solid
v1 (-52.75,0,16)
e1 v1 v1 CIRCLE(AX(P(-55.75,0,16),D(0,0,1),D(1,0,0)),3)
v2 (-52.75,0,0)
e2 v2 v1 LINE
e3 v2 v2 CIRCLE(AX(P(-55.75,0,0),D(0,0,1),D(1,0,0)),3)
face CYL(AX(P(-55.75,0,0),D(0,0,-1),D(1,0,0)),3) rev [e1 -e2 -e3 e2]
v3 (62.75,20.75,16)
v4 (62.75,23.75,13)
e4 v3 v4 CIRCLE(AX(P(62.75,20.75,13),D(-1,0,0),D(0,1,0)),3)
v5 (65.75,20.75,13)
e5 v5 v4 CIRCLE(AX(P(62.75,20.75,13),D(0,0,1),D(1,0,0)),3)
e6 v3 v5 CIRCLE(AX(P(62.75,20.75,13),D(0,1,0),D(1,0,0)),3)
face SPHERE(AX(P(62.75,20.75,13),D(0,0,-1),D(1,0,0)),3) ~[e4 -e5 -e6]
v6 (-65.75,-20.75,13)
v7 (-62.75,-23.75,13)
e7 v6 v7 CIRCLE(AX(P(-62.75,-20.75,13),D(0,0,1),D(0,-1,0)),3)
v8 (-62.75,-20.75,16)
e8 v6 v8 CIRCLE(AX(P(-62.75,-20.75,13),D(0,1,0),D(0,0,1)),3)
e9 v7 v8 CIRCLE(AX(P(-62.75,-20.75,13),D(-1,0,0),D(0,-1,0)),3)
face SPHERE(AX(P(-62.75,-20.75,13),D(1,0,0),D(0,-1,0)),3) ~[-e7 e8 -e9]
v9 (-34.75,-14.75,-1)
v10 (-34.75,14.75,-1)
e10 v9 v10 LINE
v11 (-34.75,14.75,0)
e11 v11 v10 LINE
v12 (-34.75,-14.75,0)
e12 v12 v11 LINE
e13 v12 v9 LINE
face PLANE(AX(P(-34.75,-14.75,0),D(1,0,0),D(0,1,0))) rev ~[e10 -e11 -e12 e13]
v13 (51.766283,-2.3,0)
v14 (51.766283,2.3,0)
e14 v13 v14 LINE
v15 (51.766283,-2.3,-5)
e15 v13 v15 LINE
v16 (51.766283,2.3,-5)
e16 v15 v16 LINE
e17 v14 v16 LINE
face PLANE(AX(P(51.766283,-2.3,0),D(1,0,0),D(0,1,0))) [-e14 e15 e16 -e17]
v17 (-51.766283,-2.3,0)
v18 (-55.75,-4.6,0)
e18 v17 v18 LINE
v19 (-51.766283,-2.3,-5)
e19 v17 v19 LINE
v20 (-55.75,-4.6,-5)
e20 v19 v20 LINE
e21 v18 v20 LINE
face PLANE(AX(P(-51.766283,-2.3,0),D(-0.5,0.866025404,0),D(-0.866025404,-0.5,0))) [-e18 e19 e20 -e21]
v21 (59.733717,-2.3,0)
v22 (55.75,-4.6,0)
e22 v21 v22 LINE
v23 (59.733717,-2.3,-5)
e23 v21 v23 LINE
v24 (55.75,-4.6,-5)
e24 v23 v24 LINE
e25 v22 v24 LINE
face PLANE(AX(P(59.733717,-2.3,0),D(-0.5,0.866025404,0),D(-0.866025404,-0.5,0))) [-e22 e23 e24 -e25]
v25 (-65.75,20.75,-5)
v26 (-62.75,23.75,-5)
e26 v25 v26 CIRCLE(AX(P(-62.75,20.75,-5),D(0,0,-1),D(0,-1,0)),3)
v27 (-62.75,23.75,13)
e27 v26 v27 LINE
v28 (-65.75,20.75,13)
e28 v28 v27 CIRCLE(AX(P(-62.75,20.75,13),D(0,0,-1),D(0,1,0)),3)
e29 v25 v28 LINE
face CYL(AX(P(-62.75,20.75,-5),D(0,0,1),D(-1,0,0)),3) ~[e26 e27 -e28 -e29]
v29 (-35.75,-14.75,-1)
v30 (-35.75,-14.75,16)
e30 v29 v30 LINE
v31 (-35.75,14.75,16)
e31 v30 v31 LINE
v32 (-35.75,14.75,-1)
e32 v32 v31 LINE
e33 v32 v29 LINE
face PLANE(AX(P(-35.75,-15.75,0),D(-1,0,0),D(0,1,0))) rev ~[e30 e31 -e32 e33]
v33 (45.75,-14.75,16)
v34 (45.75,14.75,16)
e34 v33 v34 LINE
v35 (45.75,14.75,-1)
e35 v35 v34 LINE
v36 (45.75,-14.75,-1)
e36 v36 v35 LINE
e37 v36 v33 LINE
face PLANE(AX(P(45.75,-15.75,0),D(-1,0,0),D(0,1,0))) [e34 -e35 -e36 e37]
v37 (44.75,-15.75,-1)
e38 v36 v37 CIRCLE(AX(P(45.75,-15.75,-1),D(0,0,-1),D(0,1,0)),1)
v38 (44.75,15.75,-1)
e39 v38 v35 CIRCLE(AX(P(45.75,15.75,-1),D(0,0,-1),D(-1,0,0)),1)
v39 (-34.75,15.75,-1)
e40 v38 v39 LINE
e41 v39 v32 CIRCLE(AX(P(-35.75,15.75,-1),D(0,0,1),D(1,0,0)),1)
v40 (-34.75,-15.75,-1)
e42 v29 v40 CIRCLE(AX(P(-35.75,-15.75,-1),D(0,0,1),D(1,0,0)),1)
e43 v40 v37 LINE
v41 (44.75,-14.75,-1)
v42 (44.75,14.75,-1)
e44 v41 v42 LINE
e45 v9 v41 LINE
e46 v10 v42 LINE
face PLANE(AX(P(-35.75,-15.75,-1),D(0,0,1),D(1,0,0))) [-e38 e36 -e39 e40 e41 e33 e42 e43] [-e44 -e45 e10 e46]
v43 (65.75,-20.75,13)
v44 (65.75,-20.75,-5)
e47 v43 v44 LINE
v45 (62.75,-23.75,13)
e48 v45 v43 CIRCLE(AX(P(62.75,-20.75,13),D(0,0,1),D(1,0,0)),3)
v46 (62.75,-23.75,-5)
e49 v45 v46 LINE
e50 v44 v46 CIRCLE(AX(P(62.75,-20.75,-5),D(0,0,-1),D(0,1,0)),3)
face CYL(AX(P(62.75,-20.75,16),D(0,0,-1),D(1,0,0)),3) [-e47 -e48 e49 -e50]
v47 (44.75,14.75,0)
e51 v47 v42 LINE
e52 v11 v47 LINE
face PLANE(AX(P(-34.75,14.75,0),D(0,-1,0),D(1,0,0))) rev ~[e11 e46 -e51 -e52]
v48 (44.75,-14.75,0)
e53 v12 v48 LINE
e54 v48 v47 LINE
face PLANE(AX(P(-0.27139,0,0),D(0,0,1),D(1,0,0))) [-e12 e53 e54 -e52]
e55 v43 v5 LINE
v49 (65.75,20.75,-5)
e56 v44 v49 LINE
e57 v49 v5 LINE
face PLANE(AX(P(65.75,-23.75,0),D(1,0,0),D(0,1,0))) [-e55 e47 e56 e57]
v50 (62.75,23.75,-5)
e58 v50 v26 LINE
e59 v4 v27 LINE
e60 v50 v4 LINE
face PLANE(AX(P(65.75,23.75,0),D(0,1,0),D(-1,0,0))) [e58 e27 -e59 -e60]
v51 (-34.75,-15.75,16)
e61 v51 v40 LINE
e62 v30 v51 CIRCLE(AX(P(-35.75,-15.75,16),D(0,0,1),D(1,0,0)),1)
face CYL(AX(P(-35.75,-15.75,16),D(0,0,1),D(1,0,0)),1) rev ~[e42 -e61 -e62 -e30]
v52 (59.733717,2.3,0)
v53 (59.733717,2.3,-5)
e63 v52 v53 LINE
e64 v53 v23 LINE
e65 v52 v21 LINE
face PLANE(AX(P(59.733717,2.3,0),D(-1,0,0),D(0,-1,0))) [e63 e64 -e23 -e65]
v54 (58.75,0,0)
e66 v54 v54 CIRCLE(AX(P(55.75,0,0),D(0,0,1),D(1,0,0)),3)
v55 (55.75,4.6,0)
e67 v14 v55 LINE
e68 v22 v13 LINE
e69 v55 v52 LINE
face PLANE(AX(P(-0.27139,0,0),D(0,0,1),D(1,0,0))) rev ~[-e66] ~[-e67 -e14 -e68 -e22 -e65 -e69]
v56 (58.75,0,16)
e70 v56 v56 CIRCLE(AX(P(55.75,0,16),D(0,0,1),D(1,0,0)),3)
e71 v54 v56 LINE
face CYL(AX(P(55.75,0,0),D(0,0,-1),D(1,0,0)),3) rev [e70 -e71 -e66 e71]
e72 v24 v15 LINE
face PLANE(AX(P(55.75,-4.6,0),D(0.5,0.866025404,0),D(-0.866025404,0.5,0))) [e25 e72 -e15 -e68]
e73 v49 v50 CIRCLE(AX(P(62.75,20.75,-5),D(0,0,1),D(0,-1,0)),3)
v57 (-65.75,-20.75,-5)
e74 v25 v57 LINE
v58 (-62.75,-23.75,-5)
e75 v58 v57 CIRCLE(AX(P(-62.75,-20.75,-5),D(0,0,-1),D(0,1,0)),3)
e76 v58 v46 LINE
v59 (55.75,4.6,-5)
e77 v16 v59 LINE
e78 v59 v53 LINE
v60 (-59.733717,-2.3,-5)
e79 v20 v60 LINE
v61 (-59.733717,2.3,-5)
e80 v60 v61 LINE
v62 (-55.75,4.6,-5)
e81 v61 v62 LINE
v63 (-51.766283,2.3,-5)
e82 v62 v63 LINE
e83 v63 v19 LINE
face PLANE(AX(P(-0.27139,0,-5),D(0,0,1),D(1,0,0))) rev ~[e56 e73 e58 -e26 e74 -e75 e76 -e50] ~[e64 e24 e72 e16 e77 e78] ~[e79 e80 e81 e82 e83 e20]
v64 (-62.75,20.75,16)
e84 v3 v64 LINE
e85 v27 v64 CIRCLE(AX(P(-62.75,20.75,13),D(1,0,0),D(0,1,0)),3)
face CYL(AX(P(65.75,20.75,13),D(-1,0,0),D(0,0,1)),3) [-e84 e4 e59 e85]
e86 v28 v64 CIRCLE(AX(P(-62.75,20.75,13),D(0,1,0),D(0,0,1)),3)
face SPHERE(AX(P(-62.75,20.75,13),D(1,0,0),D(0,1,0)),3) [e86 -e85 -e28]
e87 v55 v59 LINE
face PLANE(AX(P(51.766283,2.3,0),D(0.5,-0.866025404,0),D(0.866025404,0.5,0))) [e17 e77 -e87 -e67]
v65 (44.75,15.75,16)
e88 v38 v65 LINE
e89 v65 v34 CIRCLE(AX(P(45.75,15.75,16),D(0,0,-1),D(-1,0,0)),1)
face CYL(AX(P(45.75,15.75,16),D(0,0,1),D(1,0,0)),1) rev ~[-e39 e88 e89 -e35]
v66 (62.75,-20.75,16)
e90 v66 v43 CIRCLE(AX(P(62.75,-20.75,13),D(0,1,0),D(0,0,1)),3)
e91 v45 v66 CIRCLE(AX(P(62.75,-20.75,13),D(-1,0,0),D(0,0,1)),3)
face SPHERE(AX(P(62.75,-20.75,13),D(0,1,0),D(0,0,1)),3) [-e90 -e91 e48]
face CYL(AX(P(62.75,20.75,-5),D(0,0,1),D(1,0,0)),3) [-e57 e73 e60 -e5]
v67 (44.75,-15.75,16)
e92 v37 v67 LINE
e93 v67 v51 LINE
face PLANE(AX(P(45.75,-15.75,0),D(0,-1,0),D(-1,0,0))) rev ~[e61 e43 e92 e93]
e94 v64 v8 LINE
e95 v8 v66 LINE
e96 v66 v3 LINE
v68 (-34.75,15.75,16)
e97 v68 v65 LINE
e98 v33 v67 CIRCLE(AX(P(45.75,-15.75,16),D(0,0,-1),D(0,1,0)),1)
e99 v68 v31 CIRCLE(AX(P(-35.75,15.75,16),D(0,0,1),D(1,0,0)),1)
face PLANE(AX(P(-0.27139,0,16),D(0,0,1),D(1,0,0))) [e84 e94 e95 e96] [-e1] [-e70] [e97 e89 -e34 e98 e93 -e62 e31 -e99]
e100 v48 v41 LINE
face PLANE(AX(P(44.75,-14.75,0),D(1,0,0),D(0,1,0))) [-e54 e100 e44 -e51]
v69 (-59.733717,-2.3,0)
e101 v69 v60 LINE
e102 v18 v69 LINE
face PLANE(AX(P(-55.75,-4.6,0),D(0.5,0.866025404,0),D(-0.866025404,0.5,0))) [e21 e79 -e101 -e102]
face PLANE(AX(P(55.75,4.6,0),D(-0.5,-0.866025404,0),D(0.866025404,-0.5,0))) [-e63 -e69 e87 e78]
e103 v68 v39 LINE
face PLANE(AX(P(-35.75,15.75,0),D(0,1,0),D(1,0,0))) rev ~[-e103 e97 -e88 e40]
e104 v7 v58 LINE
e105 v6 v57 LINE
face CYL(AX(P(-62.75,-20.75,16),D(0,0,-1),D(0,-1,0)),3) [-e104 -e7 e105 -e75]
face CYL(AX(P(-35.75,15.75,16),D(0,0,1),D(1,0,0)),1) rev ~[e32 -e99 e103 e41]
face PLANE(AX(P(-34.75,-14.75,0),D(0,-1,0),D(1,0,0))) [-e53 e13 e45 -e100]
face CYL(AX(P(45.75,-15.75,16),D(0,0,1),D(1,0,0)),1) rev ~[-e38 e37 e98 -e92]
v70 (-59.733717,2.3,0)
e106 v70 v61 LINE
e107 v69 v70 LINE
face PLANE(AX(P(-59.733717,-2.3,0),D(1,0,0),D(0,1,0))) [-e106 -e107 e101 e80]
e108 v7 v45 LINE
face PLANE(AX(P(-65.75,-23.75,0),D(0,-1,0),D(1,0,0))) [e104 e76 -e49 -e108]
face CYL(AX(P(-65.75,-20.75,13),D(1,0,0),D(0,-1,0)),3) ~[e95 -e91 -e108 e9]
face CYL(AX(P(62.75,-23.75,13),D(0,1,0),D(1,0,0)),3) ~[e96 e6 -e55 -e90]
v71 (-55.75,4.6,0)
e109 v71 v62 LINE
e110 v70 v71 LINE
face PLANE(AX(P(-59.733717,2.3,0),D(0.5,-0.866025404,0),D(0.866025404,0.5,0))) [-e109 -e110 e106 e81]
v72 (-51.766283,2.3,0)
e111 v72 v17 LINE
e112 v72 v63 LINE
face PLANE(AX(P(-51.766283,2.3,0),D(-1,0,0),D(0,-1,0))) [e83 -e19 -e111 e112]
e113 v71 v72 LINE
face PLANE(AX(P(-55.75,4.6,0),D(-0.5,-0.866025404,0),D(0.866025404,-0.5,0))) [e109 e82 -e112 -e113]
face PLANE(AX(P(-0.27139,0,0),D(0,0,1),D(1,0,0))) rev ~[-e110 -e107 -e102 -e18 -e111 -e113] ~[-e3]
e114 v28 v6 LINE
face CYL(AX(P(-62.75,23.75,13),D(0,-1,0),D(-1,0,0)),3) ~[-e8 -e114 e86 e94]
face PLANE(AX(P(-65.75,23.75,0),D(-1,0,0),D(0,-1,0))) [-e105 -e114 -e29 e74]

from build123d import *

# Parameters (mm, degrees)
F0_W     = 20
F0_H     = 31.5
F0_R     = 3
F1_DEPTH = 16
F2_DEPTH = 5
F3_W     = 79.5
F3_H     = 29.5
F4_DEPTH = 1
F5_R     = 1
F6_DEPTH = 17
F7_R     = 3


# Not quite as in the source:
# - a feature names something its author has since deleted; it is built from what else it names


with BuildPart() as f1:
    # F0 (on Top) → F1 (new body)
    with BuildSketch(Plane.XY):
        Polygon((-35.75, -15.75), (-35.75, 15.75), (40.25, 15.75), (45.75, 15.75), (65.75, 15.75), (65.75, 23.75), (-65.75, 23.75), (-65.75, -23.75), (65.75, -23.75), (65.75, -15.75), (45.75, -15.75), (20.25, -15.75), align=None)
        Polygon((-51.7662831426, -2.3), (-55.75, -4.6), (-59.7337168574, -2.3), (-59.7337168574, 2.3), (-55.75, 4.6), (-51.7662831426, 2.3), align=None, mode=Mode.SUBTRACT)
        with Locations((55.75, 0)):
            Rectangle(F0_W, F0_H)
        Polygon((59.7337168574, -2.3), (55.75, -4.6), (51.7662831426, -2.3), (51.7662831426, 2.3), (55.75, 4.6), (59.7337168574, 2.3), align=None, mode=Mode.SUBTRACT)
        Polygon((-59.7337168574, -2.3), (-55.75, -4.6), (-51.7662831426, -2.3), (-51.7662831426, 2.3), (-55.75, 4.6), (-59.7337168574, 2.3), align=None)
        with Locations((-55.75, 0)):
            Circle(F0_R, mode=Mode.SUBTRACT)
        Polygon((51.7662831426, -2.3), (55.75, -4.6), (59.7337168574, -2.3), (59.7337168574, 2.3), (55.75, 4.6), (51.7662831426, 2.3), align=None)
        with Locations((55.75, 0)):
            Circle(F0_R, mode=Mode.SUBTRACT)
    extrude(amount=F1_DEPTH)

    # F0 (on Top) → F2 (join)
    with BuildSketch(Plane.XY):
        Polygon((-35.75, -15.75), (-35.75, 15.75), (40.25, 15.75), (45.75, 15.75), (65.75, 15.75), (65.75, 23.75), (-65.75, 23.75), (-65.75, -23.75), (65.75, -23.75), (65.75, -15.75), (45.75, -15.75), (20.25, -15.75), align=None)
        Polygon((-51.7662831426, -2.3), (-55.75, -4.6), (-59.7337168574, -2.3), (-59.7337168574, 2.3), (-55.75, 4.6), (-51.7662831426, 2.3), align=None, mode=Mode.SUBTRACT)
        with Locations((55.75, 0)):
            Rectangle(F0_W, F0_H)
        Polygon((59.7337168574, -2.3), (55.75, -4.6), (51.7662831426, -2.3), (51.7662831426, 2.3), (55.75, 4.6), (59.7337168574, 2.3), align=None, mode=Mode.SUBTRACT)
        Polygon((40.25, 15.75), (-35.75, 15.75), (-35.75, -15.75), (20.25, -15.75), (45.75, -15.75), (45.75, 15.75), align=None)
    extrude(amount=-F2_DEPTH)

    # F3 (on face) → F4 (cut)
    with BuildSketch(Plane.XY):
        Polygon((45.75, 15.75), (40.25, 15.75), (-35.75, 15.75), (-35.75, -15.75), (20.25, -15.75), (45.75, -15.75), align=None)
        with Locations((5, 0)):
            Rectangle(F3_W, F3_H, mode=Mode.SUBTRACT)
    extrude(amount=-F4_DEPTH, mode=Mode.SUBTRACT)

    # F5 (on face) → F6 (cut, through all)
    with BuildSketch(Plane.XY.offset(16)):
        with Locations((45.75, 15.75)):
            Circle(F5_R)
        with Locations((45.75, -15.75)):
            Circle(F5_R)
        with Locations((-35.75, -15.75)):
            Circle(F5_R)
        with Locations((-35.75, 15.75)):
            Circle(F5_R)
    extrude(amount=-F6_DEPTH, mode=Mode.SUBTRACT)

    # F7
    f7_edges = [f1.edges().sort_by_distance(p)[0] for p in [
        (65.75, 23.75, 5.5),
        (65.75, 0, 16),
        (0, 23.75, 16),
        (0, -23.75, 16),
        (65.75, -23.75, 5.5),
        (-65.75, -23.75, 5.5),
        (-65.75, 23.75, 5.5),
        (-65.75, 0, 16),
    ]]
    fillet(f7_edges, radius=F7_R)


solid = f1.part
